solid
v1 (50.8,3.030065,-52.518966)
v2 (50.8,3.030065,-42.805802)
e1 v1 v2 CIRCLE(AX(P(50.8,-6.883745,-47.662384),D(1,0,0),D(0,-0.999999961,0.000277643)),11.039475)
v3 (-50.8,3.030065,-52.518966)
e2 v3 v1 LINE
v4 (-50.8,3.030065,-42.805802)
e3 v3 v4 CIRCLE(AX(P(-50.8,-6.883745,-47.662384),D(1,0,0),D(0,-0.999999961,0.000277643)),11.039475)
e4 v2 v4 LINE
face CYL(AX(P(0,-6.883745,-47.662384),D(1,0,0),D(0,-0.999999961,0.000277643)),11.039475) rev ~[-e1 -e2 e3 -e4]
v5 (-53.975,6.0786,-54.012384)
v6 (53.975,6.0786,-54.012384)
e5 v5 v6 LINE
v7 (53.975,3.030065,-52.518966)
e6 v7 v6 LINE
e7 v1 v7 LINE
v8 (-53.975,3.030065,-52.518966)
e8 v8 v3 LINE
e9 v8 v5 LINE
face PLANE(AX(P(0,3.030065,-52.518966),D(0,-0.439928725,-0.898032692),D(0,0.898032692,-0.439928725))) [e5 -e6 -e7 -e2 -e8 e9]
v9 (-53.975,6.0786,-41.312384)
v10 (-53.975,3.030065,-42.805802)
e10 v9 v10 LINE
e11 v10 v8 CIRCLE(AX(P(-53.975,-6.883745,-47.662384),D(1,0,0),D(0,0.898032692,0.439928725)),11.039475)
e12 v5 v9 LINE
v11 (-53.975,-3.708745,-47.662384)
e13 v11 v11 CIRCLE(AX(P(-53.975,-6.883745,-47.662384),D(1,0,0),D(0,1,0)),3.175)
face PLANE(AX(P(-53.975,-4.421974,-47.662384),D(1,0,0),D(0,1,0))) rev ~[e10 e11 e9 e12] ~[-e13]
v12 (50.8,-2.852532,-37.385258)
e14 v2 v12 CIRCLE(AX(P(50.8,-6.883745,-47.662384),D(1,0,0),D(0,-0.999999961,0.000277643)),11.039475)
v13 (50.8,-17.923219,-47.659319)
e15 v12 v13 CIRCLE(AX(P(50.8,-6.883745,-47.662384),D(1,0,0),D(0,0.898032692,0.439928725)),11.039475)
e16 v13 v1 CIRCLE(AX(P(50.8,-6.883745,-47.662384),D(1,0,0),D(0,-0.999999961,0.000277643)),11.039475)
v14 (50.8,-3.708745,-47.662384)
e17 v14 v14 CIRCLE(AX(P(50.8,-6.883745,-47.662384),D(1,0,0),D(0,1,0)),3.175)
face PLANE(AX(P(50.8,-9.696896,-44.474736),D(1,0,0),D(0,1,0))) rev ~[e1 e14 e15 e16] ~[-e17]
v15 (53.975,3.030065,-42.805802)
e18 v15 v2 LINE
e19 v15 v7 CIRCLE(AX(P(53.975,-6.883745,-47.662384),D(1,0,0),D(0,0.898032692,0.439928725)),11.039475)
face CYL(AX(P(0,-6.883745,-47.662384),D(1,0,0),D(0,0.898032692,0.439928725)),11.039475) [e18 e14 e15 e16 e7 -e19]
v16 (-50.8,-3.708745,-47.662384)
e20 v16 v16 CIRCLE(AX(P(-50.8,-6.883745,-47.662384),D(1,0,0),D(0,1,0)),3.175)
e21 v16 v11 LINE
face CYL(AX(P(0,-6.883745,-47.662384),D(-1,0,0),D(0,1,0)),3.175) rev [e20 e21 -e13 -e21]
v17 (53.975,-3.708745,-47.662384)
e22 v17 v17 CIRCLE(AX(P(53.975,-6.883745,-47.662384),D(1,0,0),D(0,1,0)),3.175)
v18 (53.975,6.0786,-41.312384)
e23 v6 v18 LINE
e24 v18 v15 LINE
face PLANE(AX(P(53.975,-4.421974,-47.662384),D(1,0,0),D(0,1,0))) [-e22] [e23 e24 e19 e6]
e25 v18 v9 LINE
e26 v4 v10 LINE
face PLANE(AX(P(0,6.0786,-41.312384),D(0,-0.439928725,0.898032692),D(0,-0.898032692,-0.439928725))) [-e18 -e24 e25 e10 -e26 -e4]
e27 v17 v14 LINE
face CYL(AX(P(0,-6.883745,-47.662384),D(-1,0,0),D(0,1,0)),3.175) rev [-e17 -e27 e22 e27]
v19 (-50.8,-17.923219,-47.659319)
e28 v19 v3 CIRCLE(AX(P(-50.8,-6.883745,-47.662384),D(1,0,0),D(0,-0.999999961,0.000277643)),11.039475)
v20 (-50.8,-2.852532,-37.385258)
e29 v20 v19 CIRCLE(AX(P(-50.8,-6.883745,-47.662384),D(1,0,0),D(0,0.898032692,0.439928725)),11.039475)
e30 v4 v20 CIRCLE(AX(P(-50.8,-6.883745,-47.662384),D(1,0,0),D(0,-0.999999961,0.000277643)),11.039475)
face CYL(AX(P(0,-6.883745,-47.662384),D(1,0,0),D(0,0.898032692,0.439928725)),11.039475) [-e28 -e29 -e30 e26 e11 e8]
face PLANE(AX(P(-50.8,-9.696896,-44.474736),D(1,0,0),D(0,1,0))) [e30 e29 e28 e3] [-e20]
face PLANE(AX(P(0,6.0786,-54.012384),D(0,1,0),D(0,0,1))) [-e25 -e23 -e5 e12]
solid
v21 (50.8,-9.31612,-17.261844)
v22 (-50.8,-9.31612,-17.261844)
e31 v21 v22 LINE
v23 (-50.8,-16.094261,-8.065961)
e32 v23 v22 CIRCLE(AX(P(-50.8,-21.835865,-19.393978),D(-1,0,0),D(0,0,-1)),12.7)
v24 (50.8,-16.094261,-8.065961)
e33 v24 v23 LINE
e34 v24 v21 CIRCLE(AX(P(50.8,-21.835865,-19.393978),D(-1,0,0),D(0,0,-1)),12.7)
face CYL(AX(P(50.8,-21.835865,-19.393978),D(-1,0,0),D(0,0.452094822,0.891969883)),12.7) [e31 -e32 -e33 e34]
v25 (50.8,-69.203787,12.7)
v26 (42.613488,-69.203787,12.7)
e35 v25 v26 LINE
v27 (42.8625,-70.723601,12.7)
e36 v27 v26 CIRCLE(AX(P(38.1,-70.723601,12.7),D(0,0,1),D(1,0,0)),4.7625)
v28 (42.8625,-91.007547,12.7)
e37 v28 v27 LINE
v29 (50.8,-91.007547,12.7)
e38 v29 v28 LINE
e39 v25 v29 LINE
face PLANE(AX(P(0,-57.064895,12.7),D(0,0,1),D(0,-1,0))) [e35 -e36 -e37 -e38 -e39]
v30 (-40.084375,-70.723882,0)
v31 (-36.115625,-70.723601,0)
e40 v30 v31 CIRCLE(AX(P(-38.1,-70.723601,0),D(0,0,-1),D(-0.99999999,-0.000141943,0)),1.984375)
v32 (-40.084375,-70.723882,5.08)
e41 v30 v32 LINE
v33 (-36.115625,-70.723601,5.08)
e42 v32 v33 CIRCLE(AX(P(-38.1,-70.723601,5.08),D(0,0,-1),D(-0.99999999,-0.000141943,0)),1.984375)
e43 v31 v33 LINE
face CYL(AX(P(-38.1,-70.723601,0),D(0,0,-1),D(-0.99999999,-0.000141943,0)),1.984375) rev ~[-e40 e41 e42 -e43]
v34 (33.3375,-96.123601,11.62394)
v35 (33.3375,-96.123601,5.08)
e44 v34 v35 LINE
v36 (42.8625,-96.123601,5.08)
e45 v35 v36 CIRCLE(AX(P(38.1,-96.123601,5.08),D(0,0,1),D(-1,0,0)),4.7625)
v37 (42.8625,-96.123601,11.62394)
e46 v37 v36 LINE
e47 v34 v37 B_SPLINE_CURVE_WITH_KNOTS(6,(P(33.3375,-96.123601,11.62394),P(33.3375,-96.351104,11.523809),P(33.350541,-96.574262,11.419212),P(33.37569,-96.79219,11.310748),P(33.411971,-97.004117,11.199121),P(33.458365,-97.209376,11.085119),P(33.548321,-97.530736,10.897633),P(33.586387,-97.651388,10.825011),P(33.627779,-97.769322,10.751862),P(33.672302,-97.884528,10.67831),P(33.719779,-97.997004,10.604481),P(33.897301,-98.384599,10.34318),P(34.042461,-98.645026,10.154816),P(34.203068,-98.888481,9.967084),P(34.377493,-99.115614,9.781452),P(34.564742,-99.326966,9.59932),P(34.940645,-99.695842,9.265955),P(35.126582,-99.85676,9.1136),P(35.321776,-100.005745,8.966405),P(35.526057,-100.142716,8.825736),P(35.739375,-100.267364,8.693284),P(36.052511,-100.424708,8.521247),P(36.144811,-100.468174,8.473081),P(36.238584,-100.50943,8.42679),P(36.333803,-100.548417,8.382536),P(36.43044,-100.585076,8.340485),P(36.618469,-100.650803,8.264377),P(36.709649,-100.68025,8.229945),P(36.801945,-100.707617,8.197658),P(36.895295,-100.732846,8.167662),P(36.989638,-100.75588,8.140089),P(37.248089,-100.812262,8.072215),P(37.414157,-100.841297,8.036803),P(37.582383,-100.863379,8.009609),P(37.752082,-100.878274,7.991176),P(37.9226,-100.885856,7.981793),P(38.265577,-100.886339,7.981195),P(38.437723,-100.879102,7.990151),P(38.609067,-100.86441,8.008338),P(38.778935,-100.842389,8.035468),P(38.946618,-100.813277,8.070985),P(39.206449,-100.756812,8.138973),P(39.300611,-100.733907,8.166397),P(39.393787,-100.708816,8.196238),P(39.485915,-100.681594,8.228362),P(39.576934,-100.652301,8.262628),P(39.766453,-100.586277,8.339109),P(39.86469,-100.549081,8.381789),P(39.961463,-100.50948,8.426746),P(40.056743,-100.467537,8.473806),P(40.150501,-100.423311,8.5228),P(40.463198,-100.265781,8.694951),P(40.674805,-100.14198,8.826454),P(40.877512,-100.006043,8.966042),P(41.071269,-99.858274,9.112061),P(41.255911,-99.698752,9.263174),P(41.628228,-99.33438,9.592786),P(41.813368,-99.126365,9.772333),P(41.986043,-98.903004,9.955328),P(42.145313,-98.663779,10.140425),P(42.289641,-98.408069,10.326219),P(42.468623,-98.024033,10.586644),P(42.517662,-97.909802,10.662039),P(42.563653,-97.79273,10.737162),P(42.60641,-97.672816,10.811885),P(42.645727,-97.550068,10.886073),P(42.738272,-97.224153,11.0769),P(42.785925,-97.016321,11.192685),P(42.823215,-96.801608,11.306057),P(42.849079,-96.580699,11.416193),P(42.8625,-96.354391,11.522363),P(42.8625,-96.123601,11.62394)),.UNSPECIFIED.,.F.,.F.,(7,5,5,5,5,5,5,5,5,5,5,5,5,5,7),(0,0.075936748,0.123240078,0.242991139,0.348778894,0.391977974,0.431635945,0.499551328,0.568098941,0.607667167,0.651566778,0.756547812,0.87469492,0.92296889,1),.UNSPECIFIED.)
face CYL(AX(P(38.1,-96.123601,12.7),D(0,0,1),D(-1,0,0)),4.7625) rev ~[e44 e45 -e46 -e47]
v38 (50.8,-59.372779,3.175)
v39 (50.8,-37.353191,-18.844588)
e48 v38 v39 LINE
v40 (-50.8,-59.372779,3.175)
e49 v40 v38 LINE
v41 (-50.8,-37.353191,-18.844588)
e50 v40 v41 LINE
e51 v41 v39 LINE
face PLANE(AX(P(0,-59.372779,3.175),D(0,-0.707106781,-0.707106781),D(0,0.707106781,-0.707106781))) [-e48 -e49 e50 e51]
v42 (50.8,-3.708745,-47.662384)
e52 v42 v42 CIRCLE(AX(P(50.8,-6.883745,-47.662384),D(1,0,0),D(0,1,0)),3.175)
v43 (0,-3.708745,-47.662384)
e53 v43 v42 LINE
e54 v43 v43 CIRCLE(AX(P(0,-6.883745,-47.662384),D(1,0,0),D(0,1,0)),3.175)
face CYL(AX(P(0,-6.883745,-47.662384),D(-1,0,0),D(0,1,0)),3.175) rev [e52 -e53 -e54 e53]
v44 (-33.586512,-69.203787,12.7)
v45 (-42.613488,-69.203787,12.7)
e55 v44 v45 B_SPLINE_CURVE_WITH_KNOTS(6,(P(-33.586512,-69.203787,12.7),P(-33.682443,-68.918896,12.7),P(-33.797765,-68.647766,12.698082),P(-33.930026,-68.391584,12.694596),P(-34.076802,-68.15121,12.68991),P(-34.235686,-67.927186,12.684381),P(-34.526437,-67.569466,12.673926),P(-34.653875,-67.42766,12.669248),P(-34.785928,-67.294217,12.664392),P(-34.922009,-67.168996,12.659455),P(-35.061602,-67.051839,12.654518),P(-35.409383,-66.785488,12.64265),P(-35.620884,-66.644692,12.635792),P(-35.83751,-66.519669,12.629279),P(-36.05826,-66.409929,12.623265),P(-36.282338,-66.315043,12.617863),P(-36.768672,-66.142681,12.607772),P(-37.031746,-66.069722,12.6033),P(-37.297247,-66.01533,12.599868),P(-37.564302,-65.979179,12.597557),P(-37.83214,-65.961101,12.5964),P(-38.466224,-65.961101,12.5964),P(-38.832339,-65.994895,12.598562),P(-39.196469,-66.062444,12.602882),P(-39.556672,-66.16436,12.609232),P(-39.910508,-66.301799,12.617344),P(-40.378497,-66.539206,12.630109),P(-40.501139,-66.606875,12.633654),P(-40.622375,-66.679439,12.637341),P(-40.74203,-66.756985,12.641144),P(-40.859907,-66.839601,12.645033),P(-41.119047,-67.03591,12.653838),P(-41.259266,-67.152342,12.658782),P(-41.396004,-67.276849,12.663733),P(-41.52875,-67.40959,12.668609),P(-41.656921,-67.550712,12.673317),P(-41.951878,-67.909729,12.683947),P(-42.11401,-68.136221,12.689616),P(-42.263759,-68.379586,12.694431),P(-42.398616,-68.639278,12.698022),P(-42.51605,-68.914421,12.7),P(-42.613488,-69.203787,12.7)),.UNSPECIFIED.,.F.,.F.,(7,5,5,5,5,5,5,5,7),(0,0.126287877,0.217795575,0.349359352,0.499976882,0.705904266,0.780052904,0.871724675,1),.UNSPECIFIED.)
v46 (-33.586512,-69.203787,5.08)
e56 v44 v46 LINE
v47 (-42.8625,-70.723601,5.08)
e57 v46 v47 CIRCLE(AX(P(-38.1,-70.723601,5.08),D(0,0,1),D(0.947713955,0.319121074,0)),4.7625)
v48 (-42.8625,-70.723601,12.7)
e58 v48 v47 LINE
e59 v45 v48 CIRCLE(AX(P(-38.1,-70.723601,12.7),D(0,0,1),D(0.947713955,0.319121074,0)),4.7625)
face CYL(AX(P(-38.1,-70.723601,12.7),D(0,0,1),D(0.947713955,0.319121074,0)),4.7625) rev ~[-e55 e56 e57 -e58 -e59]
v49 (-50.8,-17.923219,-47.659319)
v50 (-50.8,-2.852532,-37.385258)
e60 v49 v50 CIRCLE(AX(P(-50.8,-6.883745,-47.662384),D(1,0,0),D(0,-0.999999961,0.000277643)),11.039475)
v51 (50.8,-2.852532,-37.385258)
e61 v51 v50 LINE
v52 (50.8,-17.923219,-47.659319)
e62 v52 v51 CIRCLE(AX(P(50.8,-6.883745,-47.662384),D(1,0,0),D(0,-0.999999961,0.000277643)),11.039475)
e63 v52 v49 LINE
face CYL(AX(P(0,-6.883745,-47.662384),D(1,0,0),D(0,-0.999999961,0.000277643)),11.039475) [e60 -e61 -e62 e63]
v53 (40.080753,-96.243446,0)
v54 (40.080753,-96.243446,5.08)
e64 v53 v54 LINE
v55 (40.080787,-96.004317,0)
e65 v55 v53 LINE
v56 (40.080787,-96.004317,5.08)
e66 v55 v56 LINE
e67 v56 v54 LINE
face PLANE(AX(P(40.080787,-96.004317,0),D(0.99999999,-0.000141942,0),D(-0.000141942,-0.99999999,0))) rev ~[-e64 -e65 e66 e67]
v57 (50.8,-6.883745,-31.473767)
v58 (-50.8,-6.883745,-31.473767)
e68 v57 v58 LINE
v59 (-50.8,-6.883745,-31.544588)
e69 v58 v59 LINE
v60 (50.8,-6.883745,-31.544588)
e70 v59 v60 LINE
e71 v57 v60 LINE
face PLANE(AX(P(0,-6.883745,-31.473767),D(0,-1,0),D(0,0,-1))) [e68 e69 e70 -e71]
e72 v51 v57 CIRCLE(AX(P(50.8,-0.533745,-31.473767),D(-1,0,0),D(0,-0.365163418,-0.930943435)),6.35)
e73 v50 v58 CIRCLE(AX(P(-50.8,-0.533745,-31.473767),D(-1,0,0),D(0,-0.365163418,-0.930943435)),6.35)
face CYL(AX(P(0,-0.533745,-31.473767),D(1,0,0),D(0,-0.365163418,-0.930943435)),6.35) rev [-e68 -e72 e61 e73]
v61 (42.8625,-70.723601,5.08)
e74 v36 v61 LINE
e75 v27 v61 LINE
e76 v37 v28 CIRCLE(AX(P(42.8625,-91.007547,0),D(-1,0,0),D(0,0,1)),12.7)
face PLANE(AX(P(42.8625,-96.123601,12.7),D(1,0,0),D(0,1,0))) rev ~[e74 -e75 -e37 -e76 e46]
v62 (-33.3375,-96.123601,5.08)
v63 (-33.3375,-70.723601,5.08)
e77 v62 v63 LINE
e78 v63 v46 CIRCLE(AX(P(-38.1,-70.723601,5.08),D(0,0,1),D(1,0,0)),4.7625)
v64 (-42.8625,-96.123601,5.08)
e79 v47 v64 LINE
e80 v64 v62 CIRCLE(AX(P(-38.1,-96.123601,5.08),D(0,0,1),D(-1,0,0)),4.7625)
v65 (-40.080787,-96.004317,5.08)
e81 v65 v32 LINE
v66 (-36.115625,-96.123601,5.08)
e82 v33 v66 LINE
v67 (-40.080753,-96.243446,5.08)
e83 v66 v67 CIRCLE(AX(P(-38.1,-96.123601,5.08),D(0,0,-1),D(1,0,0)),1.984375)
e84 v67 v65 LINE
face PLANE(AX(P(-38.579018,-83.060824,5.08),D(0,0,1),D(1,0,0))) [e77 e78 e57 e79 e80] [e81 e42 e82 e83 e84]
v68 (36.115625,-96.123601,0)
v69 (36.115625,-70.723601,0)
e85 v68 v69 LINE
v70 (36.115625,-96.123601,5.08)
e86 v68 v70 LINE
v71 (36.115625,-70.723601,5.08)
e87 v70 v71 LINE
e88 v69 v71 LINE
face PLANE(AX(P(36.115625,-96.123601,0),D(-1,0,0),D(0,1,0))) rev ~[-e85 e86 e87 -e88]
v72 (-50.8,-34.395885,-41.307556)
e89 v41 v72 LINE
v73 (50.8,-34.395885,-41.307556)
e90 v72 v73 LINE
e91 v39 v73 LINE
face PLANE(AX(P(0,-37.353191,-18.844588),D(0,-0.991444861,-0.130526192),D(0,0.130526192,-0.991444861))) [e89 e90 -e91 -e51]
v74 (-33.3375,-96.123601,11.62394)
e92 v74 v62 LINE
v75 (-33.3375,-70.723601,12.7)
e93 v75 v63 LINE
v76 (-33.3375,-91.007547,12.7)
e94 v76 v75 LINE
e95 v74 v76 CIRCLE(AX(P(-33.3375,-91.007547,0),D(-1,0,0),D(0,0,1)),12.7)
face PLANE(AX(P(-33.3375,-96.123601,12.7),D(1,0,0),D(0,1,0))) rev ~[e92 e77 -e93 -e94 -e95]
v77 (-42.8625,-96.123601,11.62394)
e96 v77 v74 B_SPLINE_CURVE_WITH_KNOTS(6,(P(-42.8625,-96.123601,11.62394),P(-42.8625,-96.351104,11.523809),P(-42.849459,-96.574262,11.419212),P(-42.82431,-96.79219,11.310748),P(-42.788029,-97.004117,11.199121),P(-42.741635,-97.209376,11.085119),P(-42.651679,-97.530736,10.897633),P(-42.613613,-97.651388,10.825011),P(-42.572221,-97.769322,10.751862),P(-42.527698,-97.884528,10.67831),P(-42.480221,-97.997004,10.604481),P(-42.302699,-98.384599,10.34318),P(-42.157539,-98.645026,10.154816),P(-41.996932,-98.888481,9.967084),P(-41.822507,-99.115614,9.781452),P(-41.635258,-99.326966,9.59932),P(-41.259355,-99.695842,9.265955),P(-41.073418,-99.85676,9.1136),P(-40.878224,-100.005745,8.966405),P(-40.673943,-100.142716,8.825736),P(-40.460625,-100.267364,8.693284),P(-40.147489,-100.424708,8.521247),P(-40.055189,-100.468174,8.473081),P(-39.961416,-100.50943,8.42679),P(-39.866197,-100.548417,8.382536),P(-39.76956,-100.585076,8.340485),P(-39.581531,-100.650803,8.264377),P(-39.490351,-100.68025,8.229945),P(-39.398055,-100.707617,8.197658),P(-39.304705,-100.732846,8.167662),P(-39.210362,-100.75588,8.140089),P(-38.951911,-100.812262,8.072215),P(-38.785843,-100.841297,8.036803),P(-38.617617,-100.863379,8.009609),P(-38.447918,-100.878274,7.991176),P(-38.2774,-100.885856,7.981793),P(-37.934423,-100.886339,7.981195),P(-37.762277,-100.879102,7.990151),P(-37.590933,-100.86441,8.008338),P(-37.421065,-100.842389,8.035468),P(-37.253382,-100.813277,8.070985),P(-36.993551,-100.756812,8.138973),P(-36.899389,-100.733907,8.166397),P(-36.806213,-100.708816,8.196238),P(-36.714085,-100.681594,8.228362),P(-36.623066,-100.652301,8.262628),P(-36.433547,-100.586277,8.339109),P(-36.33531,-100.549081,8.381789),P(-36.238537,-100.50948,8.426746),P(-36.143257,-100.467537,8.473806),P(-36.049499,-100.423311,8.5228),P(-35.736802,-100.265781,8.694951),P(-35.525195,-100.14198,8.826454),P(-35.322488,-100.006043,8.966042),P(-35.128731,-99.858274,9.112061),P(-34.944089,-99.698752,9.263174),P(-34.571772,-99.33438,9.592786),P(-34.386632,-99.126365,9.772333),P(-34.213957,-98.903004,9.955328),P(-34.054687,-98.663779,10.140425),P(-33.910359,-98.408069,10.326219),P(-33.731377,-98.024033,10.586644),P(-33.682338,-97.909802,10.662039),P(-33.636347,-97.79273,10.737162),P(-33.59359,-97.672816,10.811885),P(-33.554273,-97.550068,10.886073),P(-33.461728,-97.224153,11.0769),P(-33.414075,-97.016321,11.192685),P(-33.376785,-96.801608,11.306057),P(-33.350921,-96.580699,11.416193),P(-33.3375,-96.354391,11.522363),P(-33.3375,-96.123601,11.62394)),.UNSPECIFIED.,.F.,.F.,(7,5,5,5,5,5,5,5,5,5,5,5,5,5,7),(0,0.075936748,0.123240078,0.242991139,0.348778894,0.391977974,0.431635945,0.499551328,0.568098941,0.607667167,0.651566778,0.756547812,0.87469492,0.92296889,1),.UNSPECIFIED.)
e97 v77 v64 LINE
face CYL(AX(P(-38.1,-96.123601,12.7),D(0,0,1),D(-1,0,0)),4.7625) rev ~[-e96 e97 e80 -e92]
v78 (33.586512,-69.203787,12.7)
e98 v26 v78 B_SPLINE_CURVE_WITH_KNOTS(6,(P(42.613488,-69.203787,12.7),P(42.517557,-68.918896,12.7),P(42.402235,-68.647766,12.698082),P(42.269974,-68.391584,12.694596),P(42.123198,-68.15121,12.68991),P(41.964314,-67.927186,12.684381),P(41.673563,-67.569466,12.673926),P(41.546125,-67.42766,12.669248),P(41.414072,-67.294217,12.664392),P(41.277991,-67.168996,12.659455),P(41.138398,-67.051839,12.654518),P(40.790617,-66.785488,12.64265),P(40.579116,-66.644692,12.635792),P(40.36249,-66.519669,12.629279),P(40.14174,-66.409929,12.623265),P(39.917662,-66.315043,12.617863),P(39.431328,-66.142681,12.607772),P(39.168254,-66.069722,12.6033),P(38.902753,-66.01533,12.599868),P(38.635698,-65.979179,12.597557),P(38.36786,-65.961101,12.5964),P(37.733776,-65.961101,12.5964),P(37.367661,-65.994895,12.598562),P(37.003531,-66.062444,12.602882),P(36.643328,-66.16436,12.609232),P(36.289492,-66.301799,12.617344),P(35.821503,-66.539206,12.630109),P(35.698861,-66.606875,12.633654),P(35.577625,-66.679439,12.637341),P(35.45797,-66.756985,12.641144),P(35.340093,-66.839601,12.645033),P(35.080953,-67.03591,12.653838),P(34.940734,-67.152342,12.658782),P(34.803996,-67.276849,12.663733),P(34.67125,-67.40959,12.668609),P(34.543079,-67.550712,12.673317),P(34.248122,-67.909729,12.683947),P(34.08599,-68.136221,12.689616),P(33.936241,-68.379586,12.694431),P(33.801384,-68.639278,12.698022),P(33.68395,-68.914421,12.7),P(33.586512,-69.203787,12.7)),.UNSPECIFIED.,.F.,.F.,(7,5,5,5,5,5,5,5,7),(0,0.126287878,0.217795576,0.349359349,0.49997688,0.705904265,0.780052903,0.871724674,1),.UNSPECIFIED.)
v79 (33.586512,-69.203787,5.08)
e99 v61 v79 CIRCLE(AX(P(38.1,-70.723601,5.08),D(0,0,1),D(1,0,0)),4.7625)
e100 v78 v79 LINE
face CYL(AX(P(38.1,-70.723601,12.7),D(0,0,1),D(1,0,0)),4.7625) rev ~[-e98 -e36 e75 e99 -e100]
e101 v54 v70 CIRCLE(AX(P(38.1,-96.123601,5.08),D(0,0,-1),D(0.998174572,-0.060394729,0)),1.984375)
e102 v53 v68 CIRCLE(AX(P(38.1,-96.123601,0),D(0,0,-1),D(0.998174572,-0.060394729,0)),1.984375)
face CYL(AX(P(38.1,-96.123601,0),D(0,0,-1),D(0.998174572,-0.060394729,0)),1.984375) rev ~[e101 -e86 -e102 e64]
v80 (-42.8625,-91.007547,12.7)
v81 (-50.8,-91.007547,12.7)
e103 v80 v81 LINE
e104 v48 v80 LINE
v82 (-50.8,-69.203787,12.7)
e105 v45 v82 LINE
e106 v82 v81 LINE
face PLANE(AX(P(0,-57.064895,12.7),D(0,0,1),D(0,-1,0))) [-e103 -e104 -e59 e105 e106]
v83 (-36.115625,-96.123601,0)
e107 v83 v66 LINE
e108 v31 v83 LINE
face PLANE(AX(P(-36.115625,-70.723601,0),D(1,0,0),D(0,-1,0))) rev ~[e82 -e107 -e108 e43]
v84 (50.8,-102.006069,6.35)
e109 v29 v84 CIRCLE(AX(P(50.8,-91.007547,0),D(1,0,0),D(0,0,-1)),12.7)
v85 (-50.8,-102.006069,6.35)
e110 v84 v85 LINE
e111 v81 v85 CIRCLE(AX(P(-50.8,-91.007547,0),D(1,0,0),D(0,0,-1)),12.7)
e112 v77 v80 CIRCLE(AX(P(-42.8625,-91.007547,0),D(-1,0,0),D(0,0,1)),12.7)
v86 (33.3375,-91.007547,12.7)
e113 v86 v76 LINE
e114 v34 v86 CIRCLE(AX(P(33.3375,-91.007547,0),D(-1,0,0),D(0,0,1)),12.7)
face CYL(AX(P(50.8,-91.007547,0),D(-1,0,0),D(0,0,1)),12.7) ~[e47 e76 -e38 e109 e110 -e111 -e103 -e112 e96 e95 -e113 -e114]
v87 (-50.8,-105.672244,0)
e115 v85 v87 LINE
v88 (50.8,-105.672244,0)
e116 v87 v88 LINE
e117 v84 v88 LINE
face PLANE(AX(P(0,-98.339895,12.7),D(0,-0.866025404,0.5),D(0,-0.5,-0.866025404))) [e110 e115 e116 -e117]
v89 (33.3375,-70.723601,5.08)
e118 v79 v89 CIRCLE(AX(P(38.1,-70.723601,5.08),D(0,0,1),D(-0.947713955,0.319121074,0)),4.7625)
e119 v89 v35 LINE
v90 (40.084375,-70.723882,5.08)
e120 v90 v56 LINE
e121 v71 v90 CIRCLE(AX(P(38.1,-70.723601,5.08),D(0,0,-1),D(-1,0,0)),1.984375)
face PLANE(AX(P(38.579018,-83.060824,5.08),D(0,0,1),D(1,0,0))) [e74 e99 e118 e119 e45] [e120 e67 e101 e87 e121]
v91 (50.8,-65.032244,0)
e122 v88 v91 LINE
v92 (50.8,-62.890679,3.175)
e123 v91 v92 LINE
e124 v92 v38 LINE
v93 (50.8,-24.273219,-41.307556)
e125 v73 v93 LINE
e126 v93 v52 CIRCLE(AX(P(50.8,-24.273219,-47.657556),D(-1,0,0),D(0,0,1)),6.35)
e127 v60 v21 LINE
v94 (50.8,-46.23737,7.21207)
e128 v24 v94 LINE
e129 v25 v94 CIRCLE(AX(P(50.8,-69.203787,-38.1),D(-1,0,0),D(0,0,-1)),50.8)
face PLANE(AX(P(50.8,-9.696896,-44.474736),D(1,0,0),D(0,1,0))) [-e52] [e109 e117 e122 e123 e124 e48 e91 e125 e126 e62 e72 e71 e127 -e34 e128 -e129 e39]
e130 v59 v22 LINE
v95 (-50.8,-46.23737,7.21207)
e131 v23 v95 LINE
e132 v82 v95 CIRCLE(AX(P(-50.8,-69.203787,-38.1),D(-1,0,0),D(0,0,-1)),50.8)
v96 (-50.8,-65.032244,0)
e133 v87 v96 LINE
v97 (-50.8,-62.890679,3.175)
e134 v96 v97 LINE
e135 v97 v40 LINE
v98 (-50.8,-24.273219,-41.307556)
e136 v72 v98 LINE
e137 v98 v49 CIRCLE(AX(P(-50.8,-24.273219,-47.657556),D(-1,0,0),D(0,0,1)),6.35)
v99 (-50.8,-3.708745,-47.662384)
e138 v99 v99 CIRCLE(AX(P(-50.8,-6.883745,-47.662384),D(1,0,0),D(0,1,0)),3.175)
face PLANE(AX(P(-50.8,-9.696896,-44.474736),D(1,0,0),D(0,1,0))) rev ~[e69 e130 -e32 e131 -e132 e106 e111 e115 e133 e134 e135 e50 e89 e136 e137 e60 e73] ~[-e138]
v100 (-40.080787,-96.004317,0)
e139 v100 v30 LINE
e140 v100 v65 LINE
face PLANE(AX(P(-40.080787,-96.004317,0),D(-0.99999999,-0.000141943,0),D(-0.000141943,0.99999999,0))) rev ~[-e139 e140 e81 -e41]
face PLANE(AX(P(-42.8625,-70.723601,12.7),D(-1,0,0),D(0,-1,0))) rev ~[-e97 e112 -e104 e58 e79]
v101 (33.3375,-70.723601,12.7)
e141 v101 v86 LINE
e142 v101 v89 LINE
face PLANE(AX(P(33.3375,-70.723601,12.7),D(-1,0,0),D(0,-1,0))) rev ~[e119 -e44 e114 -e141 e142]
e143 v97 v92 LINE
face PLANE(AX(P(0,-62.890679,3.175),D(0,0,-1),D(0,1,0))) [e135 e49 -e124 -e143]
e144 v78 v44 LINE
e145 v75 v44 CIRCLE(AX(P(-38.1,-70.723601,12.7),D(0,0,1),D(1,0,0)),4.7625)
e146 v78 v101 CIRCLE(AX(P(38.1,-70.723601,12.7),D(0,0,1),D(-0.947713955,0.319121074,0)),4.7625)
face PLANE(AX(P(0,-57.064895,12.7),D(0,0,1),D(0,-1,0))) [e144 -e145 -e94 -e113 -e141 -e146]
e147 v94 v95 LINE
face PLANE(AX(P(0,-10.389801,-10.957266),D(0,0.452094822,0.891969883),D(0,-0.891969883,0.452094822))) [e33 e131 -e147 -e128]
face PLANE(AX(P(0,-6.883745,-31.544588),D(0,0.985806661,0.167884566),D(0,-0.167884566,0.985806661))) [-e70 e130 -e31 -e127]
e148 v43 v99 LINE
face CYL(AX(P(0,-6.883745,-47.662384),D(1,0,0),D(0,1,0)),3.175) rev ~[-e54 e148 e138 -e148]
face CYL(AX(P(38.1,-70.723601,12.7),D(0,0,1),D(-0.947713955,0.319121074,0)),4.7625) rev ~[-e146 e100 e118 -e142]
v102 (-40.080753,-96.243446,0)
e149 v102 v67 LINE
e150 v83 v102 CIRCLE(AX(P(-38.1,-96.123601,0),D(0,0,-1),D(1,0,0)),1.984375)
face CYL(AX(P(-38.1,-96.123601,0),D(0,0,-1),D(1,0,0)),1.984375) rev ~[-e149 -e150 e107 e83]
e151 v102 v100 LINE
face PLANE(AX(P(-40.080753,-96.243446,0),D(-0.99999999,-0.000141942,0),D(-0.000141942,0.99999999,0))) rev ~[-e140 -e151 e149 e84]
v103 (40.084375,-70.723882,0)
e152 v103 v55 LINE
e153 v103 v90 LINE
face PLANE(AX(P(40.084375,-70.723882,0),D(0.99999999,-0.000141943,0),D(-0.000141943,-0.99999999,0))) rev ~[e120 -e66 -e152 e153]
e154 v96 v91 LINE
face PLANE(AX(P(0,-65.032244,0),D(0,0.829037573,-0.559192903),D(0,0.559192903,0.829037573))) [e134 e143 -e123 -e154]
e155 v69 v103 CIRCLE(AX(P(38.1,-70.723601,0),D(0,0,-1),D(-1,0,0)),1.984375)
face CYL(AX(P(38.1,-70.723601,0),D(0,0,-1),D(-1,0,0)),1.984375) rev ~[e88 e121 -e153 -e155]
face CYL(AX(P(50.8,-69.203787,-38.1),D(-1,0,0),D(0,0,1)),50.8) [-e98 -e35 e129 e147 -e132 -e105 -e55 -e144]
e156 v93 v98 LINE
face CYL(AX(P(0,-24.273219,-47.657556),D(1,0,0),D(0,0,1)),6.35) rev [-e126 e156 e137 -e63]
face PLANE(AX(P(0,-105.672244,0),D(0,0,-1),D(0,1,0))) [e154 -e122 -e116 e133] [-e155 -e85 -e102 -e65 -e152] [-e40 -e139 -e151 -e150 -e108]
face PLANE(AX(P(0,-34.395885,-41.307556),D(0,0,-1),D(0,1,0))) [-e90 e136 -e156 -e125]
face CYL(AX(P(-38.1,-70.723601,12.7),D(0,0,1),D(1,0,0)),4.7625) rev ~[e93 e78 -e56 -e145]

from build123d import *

# Parameters (mm, degrees)
F3_DEPTH      = 50.8
F4_R          = 3.175
F5_DEPTH      = 50.8
F5_DEPTH_BACK = 50.8
F6_R          = 50.8
F7_R          = 12.7
F9_DEPTH      = 12.7
F11_DEPTH     = 7.62
F12_R         = 3.175
F13_DEPTH     = 53.975


# Not quite as in the source:
# - the program builds the solid bodies; features that only make, move or delete a surface that nothing else refers to are left out


with BuildPart() as f3:
    # F2 (on Right) → F3 (new body, symmetric)
    with BuildSketch(Plane.YZ):
        with BuildLine():
            Line((-98.3398951496, 12.7), (-105.6722435683, 0))
            Line((-105.6722435683, 0), (-65.0322435683, 0))
            Line((-65.0322435683, 0), (-62.8906790273, 3.175))
            Line((-62.8906790273, 3.175), (-59.3727790273, 3.175))
            Line((-59.3727790273, 3.175), (-37.3531910185, -18.8445880089))
            Line((-37.3531910185, -18.8445880089), (-34.3958851866, -41.307555944))
            Line((-34.3958851866, -41.307555944), (-21.6958851866, -41.307555944))
            ThreePointArc((-21.6958851866, -41.307555944), (-15.7538496208, -34.2048736472), (-6.8837446161, -31.5445880089))
            Line((-6.8837446161, -31.5445880089), (-10.3898009598, -10.9572655931))
            Line((-10.3898009598, -10.9572655931), (-57.0648951496, 12.7))
            Line((-57.0648951496, 12.7), (-98.3398951496, 12.7))
        make_face()
    extrude(amount=F3_DEPTH, both=True)

    # F4 (on Right) → F5 (join, two sides)
    with BuildSketch(Plane.YZ) as f5_sk:
        with BuildLine():
            Line((-6.8837446161, -31.4737667411), (-6.8837446161, -31.5445880089))
            ThreePointArc((-6.8837446161, -31.5445880089), (-15.7538496208, -34.2048736472), (-21.6958851866, -41.307555944))
            Line((-21.6958851866, -41.307555944), (-24.273218614, -41.307555944))
            ThreePointArc((-24.273218614, -41.307555944), (-19.7824672698, -43.1680512537), (-17.9232188588, -47.6593189789))
            ThreePointArc((-17.9232188588, -47.6593189789), (-0.665383222, -56.7838960892), (-2.8525323178, -37.3852575509))
            ThreePointArc((-2.8525323178, -37.3852575509), (-5.7800195758, -35.0513495908), (-6.8837446161, -31.4737667411))
        make_face()
        with Locations((-6.8837446161, -47.6623840148)):
            Circle(F4_R, mode=Mode.SUBTRACT)
    extrude(amount=F5_DEPTH)
    extrude(f5_sk.sketch, amount=-F5_DEPTH_BACK)

    # F6
    f6_edges = [f3.edges().sort_by_distance(p)[0] for p in [
        (0, -57.064895, 12.7),
    ]]
    fillet(f6_edges, radius=F6_R)

    # F7
    f7_edges = [f3.edges().sort_by_distance(p)[0] for p in [
        (0, -98.339895, 12.7),
        (0, -10.389801, -10.957266),
    ]]
    fillet(f7_edges, radius=F7_R)

    # F8 (on face) → F9 (cut, through all)
    with BuildSketch(Plane(origin=(0, 0, 0), x_dir=(1, 0, 0), z_dir=(0, 0, -1))):
        with BuildLine():
            Line((36.115625, 96.1236006856), (36.115625, 70.7236006856))
            ThreePointArc((36.115625, 70.7236006856), (38.1001408337, 68.7392256906), (40.08437498, 70.7238823529))
            Line((40.08437498, 70.7238823529), (40.0807866095, 96.0043172068))
            Line((40.0807866095, 96.0043172068), (40.0807526669, 96.2434464755))
            ThreePointArc((40.0807526669, 96.2434464755), (38.0400497401, 98.1070698956), (36.115625, 96.1236006856))
        make_face()
        with BuildLine():
            Line((-40.0807866095, 96.0043172068), (-40.08437498, 70.7238823529))
            ThreePointArc((-40.08437498, 70.7238823529), (-38.1001408337, 68.7392256906), (-36.115625, 70.7236006856))
            Line((-36.115625, 70.7236006856), (-36.115625, 96.1236006856))
            ThreePointArc((-36.115625, 96.1236006856), (-38.0400497401, 98.1070698956), (-40.0807526669, 96.2434464755))
            Line((-40.0807526669, 96.2434464755), (-40.0807866095, 96.0043172068))
        make_face()
    extrude(amount=-F9_DEPTH, mode=Mode.SUBTRACT)

    # F10 (on face) → F11 (cut)
    with BuildSketch(Plane.XY.offset(12.7)):
        with BuildLine():
            Line((-42.8625, -70.7236006856), (-42.8625, -96.1236006856))
            ThreePointArc((-42.8625, -96.1236006856), (-38.1, -100.8861006856), (-33.3375, -96.1236006856))
            Line((-33.3375, -96.1236006856), (-33.3375, -91.0075467309))
            Line((-33.3375, -91.0075467309), (-36.115625, -91.0075467309))
            Line((-36.115625, -91.0075467309), (-36.115625, -70.7236006856))
            ThreePointArc((-36.115625, -70.7236006856), (-36.30144514, -69.8851827968), (-36.8241045528, -69.2037865692))
            Line((-36.8241045528, -69.2037865692), (-33.5865122907, -69.2037865692))
            ThreePointArc((-33.5865122907, -69.2037865692), (-38.870039296, -66.0237660361), (-42.8625, -70.7236006856))
        make_face()
        with BuildLine():
            Line((-36.115625, -91.0075467309), (-33.3375, -91.0075467309))
            Line((-33.3375, -91.0075467309), (-33.3375, -70.7236006856))
            ThreePointArc((-33.3375, -70.7236006856), (-33.4001653505, -69.9535613896), (-33.5865122907, -69.2037865692))
            Line((-33.5865122907, -69.2037865692), (-36.8241045528, -69.2037865692))
            ThreePointArc((-36.8241045528, -69.2037865692), (-36.30144514, -69.8851827968), (-36.115625, -70.7236006856))
            Line((-36.115625, -70.7236006856), (-36.115625, -91.0075467309))
        make_face()
        with BuildLine():
            Line((36.115625, -91.0075467309), (33.3375, -91.0075467309))
            Line((33.3375, -91.0075467309), (33.3375, -96.1236006856))
            ThreePointArc((33.3375, -96.1236006856), (38.1, -100.8861006856), (42.8625, -96.1236006856))
            Line((42.8625, -96.1236006856), (42.8625, -70.7236006856))
            ThreePointArc((42.8625, -70.7236006856), (38.870039296, -66.0237660361), (33.5865122907, -69.2037865692))
            Line((33.5865122907, -69.2037865692), (36.8241045528, -69.2037865692))
            ThreePointArc((36.8241045528, -69.2037865692), (36.30144514, -69.8851827968), (36.115625, -70.7236006856))
            Line((36.115625, -70.7236006856), (36.115625, -91.0075467309))
        make_face()
        with BuildLine():
            Line((33.3375, -70.7236006856), (33.3375, -91.0075467309))
            Line((33.3375, -91.0075467309), (36.115625, -91.0075467309))
            Line((36.115625, -91.0075467309), (36.115625, -70.7236006856))
            ThreePointArc((36.115625, -70.7236006856), (36.30144514, -69.8851827968), (36.8241045528, -69.2037865692))
            Line((36.8241045528, -69.2037865692), (33.5865122907, -69.2037865692))
            ThreePointArc((33.5865122907, -69.2037865692), (33.4001653505, -69.9535613896), (33.3375, -70.7236006856))
        make_face()
    extrude(amount=-F11_DEPTH, mode=Mode.SUBTRACT)


with BuildPart() as f13:
    # F12 (on Right) → F13 (new body, symmetric)
    with BuildSketch(Plane.YZ):
        with BuildLine():
            ThreePointArc((3.0300645432, -42.8058019962), (-17.9232192843, -47.6623840148), (3.0300645432, -52.5189660334))
            Line((3.0300645432, -52.5189660334), (6.0785996665, -54.0123840148))
            Line((6.0785996665, -54.0123840148), (6.0785996665, -41.3123840148))
            Line((6.0785996665, -41.3123840148), (3.0300645432, -42.8058019962))
        make_face()
        with Locations((-6.8837446161, -47.6623840148)):
            Circle(F12_R, mode=Mode.SUBTRACT)
    extrude(amount=F13_DEPTH, both=True)

    # F14: cut F3
    add(f3.part, mode=Mode.SUBTRACT)


solid = Compound([f3.part, f13.part])
